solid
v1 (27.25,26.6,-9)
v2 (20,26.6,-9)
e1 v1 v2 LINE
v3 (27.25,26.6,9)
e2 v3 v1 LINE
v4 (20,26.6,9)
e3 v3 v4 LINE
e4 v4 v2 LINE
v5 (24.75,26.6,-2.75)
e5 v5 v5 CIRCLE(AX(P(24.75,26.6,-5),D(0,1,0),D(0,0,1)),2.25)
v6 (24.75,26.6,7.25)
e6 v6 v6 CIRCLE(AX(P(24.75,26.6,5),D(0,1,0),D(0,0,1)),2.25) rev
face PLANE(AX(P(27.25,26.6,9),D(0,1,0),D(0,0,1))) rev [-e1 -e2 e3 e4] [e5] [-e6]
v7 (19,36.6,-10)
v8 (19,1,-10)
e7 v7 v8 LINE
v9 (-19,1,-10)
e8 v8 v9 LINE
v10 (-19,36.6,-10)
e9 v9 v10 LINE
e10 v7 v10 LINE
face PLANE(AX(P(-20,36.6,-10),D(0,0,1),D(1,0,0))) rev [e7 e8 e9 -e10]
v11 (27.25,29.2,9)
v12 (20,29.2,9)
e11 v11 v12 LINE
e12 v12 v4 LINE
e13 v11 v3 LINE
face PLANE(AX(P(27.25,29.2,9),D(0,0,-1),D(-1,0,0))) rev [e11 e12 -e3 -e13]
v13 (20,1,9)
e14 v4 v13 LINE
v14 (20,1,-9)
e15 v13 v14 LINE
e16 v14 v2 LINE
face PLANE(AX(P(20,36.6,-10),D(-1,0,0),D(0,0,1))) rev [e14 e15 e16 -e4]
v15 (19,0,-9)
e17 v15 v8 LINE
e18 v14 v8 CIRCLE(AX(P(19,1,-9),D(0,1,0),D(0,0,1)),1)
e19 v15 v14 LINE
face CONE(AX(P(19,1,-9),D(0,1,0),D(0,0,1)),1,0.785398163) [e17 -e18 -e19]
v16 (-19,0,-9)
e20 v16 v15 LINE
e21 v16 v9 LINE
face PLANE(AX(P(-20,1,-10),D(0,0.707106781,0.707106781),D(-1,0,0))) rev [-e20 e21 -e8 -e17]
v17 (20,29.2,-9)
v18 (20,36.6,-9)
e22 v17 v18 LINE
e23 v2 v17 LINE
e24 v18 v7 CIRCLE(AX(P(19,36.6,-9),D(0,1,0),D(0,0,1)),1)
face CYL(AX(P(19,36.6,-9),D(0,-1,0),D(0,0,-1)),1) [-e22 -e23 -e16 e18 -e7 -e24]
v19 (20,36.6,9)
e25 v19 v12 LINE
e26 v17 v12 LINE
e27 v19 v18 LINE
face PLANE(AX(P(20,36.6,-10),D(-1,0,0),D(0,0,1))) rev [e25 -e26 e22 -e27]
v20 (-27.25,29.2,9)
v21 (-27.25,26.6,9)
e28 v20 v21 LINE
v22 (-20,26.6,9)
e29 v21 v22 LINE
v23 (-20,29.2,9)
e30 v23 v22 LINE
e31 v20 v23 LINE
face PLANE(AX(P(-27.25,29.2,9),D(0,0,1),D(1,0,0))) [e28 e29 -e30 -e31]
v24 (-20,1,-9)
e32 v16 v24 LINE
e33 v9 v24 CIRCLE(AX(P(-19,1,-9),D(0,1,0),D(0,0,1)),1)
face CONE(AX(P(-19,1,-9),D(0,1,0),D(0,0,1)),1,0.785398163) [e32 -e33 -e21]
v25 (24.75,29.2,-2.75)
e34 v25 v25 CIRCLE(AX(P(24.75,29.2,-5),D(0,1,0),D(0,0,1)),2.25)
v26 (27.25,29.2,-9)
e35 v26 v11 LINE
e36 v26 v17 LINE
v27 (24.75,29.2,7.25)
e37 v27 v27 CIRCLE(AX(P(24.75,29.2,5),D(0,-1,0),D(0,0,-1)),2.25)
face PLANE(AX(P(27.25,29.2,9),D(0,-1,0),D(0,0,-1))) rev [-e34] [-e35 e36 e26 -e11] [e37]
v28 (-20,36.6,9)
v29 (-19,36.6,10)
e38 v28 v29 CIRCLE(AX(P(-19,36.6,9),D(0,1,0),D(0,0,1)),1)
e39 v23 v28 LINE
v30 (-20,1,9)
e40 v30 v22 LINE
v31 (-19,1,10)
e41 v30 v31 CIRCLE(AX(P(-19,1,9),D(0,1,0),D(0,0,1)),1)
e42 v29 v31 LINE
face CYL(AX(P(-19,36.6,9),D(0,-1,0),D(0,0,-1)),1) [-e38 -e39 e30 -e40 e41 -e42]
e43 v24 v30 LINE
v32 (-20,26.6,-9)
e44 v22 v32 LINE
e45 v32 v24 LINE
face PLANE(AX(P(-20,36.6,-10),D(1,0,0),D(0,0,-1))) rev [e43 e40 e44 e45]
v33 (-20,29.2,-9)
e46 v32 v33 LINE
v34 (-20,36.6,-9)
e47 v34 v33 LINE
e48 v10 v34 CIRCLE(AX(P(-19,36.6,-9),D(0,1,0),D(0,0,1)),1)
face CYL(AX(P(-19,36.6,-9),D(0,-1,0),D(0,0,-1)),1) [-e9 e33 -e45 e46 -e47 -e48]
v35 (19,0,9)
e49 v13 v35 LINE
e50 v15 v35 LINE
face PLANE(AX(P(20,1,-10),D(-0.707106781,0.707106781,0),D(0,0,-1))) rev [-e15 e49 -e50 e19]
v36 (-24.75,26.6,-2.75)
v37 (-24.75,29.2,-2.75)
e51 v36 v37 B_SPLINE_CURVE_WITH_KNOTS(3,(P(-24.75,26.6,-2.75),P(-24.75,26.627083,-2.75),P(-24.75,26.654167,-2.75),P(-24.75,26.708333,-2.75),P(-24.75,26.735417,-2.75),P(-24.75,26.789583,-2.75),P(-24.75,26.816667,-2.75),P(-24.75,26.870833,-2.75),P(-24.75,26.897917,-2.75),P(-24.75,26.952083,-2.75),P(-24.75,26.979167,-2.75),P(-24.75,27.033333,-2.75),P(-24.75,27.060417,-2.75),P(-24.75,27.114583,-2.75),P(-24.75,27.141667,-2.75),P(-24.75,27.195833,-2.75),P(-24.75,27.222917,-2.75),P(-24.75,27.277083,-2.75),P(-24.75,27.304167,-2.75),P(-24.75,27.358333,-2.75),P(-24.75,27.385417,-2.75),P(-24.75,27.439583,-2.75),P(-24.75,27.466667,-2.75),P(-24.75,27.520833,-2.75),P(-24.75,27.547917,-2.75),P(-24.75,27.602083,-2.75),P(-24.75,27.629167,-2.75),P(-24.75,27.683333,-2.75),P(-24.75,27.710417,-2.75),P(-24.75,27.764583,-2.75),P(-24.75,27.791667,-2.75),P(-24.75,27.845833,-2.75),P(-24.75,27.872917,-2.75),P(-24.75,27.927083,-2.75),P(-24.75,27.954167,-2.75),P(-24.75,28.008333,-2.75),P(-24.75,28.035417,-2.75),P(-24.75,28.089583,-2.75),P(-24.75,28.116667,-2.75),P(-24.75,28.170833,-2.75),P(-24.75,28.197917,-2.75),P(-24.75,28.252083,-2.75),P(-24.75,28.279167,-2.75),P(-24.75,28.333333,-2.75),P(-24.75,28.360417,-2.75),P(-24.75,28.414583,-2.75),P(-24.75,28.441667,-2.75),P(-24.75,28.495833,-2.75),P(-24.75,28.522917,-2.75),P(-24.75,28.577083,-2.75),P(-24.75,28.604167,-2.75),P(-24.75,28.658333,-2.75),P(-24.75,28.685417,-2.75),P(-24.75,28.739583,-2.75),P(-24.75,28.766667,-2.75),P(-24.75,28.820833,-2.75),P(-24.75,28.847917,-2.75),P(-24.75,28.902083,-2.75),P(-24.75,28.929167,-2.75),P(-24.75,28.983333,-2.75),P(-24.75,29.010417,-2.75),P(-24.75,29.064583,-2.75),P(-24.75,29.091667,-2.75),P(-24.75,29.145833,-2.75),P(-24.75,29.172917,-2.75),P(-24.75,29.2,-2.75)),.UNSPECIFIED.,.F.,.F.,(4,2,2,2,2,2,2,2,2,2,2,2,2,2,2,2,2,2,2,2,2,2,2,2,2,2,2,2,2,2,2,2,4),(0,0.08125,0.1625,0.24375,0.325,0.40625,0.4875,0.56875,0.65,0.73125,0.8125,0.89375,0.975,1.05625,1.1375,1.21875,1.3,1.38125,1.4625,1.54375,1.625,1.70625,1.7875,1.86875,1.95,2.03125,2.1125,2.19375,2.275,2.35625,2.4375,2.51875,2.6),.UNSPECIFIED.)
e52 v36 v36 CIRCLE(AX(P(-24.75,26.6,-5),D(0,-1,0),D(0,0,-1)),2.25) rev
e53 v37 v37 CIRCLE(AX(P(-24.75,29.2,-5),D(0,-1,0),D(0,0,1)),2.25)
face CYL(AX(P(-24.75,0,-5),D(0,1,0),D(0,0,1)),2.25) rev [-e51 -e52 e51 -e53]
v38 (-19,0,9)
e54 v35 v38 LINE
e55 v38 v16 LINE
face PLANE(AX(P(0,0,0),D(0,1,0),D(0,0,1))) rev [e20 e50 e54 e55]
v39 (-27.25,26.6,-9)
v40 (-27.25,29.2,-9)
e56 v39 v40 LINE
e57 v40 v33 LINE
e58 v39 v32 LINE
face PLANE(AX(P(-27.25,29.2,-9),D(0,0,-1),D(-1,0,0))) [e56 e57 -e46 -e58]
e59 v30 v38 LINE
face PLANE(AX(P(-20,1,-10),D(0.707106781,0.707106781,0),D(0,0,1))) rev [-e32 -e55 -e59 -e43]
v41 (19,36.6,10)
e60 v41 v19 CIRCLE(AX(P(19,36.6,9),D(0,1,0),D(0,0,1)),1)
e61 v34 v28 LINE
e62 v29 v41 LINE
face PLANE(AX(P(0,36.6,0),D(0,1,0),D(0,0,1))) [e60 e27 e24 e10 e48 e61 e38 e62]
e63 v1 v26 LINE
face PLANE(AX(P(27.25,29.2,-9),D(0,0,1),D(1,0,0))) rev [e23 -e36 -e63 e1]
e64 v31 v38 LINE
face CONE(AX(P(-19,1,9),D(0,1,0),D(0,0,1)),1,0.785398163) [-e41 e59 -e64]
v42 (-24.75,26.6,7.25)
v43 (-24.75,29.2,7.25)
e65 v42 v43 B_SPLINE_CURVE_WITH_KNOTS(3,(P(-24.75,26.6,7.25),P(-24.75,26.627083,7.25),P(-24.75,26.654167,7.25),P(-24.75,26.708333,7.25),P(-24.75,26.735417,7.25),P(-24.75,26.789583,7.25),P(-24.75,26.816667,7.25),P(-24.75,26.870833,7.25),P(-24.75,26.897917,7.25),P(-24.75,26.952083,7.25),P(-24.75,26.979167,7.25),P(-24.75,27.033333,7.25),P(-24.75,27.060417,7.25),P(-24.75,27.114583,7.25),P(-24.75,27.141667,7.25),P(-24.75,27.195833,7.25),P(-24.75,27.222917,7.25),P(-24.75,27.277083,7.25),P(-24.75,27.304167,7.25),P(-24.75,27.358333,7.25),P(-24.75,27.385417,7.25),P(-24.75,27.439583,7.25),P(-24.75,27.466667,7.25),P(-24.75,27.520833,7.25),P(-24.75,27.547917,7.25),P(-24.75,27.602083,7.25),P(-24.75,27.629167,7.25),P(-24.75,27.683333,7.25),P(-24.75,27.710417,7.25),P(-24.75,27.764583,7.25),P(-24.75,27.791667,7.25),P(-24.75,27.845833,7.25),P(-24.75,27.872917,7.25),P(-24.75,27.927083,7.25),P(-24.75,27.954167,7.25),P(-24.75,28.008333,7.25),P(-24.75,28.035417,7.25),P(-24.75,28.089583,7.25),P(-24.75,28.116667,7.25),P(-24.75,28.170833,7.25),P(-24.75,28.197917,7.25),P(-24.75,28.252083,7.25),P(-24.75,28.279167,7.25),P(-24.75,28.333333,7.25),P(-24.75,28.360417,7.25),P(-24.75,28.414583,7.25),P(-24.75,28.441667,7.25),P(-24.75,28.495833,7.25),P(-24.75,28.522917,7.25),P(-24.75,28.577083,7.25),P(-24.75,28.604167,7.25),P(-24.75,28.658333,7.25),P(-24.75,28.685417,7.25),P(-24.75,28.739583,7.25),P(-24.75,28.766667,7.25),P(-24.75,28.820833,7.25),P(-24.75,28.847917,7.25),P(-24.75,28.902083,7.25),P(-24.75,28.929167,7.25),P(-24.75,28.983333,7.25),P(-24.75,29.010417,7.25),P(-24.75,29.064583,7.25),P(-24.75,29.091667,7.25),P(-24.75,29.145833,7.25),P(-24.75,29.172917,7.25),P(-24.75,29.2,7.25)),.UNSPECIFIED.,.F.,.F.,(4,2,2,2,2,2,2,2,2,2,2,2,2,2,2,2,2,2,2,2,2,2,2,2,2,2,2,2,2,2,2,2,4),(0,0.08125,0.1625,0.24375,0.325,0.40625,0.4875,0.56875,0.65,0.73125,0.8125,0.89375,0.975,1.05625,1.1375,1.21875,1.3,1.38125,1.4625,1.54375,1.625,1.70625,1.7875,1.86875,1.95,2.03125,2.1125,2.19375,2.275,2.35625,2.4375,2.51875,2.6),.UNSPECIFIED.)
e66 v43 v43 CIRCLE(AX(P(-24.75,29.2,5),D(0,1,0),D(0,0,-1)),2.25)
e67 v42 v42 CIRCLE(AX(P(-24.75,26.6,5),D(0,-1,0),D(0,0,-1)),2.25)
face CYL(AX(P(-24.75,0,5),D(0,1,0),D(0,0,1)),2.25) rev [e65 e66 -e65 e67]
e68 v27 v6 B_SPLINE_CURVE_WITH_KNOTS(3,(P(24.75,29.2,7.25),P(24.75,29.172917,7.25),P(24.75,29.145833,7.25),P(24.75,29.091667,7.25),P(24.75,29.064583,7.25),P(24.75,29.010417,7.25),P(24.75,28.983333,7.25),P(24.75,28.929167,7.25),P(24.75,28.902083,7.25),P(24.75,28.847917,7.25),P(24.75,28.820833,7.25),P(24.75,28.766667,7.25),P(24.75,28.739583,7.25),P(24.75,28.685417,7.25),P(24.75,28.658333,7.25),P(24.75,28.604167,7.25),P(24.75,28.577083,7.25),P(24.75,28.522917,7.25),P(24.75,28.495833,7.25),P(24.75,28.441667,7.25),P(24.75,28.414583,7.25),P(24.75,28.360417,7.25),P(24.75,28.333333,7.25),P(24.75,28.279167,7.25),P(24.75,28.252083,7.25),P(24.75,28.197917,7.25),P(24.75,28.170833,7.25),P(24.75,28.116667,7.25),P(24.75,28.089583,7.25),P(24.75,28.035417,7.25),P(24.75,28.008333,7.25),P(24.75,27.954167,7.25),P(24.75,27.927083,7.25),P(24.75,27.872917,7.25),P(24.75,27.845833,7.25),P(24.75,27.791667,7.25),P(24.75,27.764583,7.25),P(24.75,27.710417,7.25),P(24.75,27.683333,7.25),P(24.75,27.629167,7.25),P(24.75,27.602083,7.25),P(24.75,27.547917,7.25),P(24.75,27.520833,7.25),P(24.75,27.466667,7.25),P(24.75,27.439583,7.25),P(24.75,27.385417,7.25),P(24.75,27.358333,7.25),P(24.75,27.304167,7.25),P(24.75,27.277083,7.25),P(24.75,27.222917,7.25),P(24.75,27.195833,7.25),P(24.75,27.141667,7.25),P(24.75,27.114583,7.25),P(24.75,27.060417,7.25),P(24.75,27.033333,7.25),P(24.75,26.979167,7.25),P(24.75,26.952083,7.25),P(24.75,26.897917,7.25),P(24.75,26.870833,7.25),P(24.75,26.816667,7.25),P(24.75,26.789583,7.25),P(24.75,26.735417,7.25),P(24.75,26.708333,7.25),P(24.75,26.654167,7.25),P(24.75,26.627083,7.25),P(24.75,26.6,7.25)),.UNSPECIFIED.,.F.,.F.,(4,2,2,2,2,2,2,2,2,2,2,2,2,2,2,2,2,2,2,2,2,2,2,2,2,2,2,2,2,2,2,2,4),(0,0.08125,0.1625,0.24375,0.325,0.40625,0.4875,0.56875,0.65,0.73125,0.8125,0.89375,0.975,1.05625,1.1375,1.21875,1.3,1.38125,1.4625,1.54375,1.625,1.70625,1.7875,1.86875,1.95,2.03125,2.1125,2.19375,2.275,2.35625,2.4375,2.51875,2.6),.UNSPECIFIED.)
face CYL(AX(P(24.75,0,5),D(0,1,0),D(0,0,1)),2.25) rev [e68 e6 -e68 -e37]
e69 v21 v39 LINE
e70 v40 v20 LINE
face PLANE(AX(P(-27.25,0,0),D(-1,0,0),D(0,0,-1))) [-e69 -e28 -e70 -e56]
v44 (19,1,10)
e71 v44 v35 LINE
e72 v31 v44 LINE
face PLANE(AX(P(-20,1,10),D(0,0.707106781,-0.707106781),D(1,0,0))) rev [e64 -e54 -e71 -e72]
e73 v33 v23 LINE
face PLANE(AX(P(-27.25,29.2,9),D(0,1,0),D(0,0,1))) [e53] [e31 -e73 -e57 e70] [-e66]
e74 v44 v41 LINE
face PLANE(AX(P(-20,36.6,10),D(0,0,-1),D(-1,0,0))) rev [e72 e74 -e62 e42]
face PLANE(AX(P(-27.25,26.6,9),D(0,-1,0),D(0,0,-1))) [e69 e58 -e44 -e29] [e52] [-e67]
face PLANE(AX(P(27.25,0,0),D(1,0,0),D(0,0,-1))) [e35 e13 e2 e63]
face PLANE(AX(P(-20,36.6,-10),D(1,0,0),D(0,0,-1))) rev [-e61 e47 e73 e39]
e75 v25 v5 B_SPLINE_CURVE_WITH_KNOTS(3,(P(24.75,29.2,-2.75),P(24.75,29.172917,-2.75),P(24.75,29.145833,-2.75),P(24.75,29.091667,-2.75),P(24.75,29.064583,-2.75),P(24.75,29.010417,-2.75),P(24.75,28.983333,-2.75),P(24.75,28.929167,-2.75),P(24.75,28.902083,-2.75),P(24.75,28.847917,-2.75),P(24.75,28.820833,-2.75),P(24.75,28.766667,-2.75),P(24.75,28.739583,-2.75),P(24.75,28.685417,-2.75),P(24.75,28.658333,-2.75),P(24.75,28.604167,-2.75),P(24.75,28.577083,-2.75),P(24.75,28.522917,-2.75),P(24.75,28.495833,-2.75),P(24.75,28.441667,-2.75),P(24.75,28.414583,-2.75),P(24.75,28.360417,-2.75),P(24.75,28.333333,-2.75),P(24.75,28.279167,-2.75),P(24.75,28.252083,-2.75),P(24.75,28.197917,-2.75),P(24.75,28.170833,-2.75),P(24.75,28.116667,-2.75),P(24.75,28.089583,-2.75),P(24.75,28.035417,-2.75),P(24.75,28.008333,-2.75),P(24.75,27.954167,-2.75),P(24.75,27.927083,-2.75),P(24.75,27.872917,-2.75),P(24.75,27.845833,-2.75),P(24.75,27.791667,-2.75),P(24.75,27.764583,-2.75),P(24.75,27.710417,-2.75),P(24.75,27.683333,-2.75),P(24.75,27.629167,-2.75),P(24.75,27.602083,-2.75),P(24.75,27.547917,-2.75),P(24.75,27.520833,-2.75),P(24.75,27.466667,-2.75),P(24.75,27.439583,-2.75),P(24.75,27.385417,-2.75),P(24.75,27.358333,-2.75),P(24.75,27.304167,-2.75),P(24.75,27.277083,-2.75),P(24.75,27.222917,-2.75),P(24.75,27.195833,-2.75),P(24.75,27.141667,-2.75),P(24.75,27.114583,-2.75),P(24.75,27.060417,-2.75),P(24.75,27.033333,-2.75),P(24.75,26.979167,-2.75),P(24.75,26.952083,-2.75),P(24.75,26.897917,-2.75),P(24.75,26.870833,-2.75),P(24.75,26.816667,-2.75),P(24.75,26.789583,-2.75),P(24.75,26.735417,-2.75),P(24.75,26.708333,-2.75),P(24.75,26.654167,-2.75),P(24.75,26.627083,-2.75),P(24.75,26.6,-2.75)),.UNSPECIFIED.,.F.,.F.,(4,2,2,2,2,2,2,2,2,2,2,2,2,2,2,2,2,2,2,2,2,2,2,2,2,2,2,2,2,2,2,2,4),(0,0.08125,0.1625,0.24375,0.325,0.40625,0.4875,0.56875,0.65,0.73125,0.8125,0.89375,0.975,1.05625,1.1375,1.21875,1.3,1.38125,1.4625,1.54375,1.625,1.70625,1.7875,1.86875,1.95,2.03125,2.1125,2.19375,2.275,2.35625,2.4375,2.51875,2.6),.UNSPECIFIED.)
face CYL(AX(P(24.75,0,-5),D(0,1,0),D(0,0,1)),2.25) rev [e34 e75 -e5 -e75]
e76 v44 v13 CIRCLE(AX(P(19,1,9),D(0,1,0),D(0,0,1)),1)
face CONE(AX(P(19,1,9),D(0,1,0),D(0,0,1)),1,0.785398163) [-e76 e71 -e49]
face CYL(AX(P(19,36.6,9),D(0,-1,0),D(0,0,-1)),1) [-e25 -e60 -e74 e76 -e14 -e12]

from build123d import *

# Parameters (mm, degrees)
SKETCH1_W               = 40
SKETCH1_H               = 20
BOSS_EXTRUDE1_DEPTH     = 36.6
SKETCH2_W               = 18
SKETCH2_H               = 2.6
BOSS_EXTRUDE2_DEPTH     = 7.25
SKETCH3_R               = 2.25
CUT_EXTRUDE1_DEPTH      = 42.17283692
MIRROR3_COPY_1_SKETCH_R = 2.25
MIRROR3_COPY_1_DEPTH    = 42.17283692
FILLET1_R               = 1
CHAMFER1_SIZE           = 1


with BuildPart() as part:
    # Sketch1 → Boss-Extrude1 (new body)
    with BuildSketch(Plane(origin=(0, 0, 0), x_dir=(1, 0, 0), z_dir=(0, 1, 0))):
        Rectangle(SKETCH1_W, SKETCH1_H)
    extrude(amount=BOSS_EXTRUDE1_DEPTH)

    # Sketch2 → Boss-Extrude2 (add)
    with BuildSketch(Plane(origin=(20, 0, 0), x_dir=(0, 0, -1), z_dir=(1, 0, 0))):
        with Locations((0, 27.9)):
            Rectangle(SKETCH2_W, SKETCH2_H)
    boss_extrude2 = extrude(amount=BOSS_EXTRUDE2_DEPTH)

    # Sketch3 → Cut-Extrude1 (cut, through all)
    with BuildSketch(Plane(origin=(0, 29.2, 0), x_dir=(1, 0, 0), z_dir=(0, 1, 0))):
        with Locations(Location((24.75, 5, 0), (0, 0, 270))):
            Circle(SKETCH3_R)
    cut_extrude1 = extrude(amount=-CUT_EXTRUDE1_DEPTH, mode=Mode.SUBTRACT)

    # Mirror2: Cut-Extrude1 across plane
    add(cut_extrude1.mirror(Plane.XY), mode=Mode.SUBTRACT)

    # Mirror3: Boss-Extrude2, Cut-Extrude1 across plane
    add(boss_extrude2.mirror(Plane(origin=(0, 0, 0), x_dir=(0, 0, 1), z_dir=(1, 0, 0))))
    add(cut_extrude1.mirror(Plane(origin=(0, 0, 0), x_dir=(0, 0, 1), z_dir=(1, 0, 0))), mode=Mode.SUBTRACT)

    # Mirror3 copy 1 sketch → Mirror3 copy 1 (cut, through all)
    with BuildSketch(Plane(origin=(0, 29.2, 0), x_dir=(-1, 0, 0), z_dir=(0, 1, 0))):
        with Locations(Location((24.75, 5, 0), (0, 0, 270))):
            Circle(MIRROR3_COPY_1_SKETCH_R)
    extrude(amount=-MIRROR3_COPY_1_DEPTH, mode=Mode.SUBTRACT)

    # Fillet1
    fillet1_edges = [part.edges().sort_by_distance(p)[0] for p in [
        (20, 18.3, 10),
        (-20, 18.3, 10),
        (-20, 18.3, -10),
        (20, 18.3, -10),
    ]]
    fillet(fillet1_edges, radius=FILLET1_R - 0.0001)  # a hair under: the kernel refuses the full size

    # Chamfer1
    chamfer1_edges = [part.edges().sort_by_distance(p)[0] for p in [
        (20, 0, 0),
        (0, 0, 10),
        (-20, 0, 0),
        (0, 0, -10),
        (-19.707136071, 0, 9.707136071),
        (-19.707136071, 0, -9.707136071),
        (19.707136071, 0, -9.707136071),
        (19.707136071, 0, 9.707136071),
    ]]
    chamfer(chamfer1_edges, length=CHAMFER1_SIZE - 0.0001)  # a hair under: the kernel refuses the full size


solid = part.part
